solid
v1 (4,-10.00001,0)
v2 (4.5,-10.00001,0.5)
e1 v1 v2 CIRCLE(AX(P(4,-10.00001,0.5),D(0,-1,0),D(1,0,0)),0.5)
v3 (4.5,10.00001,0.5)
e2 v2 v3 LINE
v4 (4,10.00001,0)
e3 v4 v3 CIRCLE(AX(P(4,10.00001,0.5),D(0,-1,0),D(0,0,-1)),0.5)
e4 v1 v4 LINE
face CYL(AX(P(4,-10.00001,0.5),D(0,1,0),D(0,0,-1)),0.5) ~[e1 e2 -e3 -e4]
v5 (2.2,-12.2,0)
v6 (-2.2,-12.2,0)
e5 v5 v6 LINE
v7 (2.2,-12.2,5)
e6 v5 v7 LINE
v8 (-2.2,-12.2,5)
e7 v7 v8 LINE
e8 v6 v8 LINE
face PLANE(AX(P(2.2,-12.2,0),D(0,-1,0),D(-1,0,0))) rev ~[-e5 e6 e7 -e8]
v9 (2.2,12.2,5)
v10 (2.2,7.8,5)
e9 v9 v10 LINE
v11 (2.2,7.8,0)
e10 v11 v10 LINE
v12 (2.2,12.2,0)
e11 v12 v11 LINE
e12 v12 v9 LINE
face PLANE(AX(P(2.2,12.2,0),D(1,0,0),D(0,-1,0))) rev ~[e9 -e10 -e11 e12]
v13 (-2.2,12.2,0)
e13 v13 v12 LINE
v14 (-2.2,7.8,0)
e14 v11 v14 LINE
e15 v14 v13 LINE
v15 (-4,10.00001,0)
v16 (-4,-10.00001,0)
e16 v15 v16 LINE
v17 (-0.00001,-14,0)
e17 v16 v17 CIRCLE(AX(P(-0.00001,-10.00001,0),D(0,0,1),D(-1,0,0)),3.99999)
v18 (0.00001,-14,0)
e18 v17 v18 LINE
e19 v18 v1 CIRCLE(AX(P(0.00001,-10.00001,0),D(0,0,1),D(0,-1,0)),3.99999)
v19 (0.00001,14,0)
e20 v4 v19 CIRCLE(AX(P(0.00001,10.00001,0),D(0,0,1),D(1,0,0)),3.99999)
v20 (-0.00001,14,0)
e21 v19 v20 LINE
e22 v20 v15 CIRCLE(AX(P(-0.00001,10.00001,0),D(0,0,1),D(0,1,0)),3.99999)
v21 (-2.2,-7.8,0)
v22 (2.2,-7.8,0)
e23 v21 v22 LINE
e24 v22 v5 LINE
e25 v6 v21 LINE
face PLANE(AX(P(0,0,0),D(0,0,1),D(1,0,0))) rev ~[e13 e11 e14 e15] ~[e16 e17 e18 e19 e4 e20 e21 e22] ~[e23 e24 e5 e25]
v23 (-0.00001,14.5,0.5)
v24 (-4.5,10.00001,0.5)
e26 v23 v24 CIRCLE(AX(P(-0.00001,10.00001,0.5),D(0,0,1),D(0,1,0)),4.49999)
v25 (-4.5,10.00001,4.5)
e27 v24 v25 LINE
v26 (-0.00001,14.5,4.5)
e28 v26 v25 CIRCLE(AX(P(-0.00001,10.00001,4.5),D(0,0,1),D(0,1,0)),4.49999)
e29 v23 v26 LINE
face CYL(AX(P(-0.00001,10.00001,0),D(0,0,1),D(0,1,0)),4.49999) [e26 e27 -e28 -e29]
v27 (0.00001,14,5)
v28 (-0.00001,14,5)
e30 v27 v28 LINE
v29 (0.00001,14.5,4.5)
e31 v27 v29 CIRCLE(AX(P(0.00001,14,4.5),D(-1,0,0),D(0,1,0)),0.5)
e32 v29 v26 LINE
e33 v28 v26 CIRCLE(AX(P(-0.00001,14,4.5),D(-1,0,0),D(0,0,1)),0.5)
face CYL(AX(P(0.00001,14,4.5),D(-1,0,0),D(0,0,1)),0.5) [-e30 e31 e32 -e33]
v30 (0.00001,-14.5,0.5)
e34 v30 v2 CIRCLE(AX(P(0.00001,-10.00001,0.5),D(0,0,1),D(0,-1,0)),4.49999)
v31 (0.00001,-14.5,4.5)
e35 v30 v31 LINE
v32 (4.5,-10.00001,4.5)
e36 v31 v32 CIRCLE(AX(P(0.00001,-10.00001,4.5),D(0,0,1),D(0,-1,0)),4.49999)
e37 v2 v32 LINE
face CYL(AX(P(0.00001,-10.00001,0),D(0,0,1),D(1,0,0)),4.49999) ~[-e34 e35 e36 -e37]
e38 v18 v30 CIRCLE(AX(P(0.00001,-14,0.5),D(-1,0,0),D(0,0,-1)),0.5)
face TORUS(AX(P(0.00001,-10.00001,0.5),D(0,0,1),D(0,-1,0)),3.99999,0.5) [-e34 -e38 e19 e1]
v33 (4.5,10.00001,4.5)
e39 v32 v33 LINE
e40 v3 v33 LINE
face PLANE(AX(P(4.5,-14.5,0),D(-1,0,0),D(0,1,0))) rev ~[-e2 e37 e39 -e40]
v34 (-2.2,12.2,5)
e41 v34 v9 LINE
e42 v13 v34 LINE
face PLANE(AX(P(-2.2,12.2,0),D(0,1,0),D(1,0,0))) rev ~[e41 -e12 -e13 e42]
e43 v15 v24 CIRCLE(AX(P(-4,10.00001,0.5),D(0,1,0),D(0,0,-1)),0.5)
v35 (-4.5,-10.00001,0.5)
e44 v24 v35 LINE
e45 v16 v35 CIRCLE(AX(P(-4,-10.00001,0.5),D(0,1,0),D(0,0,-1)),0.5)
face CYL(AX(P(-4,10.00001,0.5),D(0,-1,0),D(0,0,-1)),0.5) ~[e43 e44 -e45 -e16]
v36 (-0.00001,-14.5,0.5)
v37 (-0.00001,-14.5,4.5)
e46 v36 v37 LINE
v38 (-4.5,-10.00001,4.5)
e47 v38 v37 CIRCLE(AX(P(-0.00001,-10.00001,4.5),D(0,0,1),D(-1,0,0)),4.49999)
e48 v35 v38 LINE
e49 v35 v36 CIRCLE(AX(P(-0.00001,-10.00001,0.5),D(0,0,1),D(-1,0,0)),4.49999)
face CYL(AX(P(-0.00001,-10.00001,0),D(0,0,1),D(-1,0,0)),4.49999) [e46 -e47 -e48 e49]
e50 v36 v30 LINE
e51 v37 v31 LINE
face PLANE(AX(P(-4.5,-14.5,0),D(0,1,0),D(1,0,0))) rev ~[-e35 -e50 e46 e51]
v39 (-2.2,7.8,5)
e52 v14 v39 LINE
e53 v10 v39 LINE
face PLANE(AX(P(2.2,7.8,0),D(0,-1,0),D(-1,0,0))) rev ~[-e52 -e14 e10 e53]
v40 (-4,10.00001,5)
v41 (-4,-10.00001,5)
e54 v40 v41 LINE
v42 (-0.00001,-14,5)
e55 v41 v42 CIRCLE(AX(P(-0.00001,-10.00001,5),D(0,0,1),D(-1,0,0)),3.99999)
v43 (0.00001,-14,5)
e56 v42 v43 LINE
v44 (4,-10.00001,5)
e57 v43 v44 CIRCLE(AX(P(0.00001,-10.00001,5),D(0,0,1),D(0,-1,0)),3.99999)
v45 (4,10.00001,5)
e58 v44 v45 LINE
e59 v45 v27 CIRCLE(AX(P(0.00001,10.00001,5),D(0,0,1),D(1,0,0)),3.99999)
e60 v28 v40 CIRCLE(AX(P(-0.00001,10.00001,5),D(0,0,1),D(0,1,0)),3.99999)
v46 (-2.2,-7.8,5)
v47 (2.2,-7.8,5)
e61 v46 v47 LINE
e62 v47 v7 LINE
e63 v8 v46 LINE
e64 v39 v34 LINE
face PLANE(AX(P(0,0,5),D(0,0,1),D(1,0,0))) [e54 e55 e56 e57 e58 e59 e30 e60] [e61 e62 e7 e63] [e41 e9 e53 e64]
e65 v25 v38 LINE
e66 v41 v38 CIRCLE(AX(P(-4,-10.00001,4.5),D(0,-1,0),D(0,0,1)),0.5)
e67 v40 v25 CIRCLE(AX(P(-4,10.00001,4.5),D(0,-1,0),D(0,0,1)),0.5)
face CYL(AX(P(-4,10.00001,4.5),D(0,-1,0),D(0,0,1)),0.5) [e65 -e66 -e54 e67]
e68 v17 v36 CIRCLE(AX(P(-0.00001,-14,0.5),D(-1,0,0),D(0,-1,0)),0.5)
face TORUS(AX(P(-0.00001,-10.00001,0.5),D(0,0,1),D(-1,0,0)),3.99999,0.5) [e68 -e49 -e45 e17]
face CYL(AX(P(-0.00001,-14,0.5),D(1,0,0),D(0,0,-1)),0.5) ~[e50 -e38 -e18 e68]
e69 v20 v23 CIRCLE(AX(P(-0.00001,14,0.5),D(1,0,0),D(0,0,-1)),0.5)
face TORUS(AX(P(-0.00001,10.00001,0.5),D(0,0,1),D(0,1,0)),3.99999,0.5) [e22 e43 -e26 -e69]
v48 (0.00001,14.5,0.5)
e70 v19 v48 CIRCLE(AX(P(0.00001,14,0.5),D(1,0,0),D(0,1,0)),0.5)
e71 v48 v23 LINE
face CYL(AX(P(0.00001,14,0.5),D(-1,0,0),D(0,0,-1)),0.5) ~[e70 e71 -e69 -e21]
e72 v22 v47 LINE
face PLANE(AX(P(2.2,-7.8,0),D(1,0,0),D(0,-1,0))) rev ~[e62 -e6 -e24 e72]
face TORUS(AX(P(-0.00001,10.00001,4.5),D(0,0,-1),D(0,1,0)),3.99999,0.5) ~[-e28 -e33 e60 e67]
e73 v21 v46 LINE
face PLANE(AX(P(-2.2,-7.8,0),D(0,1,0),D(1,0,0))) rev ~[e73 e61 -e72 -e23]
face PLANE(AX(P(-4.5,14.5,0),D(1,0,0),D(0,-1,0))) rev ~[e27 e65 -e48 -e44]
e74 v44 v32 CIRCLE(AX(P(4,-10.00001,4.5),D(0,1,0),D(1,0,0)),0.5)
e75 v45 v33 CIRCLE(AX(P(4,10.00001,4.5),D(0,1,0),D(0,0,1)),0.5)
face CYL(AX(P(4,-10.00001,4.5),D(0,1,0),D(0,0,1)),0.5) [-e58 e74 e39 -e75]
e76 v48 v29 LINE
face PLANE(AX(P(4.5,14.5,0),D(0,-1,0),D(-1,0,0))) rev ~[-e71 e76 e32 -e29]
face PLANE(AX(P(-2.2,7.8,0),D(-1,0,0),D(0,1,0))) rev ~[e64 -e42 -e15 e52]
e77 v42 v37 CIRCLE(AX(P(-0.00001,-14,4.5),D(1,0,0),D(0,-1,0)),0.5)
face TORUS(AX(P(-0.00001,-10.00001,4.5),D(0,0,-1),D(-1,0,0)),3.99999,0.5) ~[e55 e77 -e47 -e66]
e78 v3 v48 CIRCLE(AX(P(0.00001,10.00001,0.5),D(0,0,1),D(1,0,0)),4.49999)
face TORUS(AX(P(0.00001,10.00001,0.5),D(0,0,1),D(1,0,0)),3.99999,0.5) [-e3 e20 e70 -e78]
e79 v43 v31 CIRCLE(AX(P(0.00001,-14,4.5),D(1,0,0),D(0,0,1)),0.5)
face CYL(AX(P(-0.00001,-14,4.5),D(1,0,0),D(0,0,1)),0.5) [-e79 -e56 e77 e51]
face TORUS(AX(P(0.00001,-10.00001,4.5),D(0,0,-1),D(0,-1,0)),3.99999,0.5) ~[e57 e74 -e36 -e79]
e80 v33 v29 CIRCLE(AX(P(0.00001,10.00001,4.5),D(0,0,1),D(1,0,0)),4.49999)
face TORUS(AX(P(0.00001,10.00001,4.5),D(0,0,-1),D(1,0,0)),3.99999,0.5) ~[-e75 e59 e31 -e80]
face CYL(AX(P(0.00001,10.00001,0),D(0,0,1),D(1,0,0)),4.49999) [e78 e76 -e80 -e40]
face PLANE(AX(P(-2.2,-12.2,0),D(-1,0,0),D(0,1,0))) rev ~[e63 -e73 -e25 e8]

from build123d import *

# Parameters (mm, degrees)
F1_DEPTH = 5
F2_R     = 4.49999
F3_R     = 0.5


# Not quite as in the source:
# - a fillet or chamfer is up to 0.001 mm smaller than in the source, because OpenCascade refuses the exact size


with BuildPart() as f1:
    # F0 (on Top) → F1 (new body)
    with BuildSketch(Plane.XY):
        Polygon((4.5, -14.5), (4.5, 14.5), (0, 14.5), (-4.5, 14.5), (-4.5, -14.5), (0, -14.5), align=None)
        Polygon((2.2, -12.2), (0, -12.2), (-2.2, -12.2), (-2.2, -7.8), (2.2, -7.8), align=None, mode=Mode.SUBTRACT)
        Polygon((-2.2, 12.2), (0, 12.2), (2.2, 12.2), (2.2, 7.8), (-2.2, 7.8), align=None, mode=Mode.SUBTRACT)
    extrude(amount=F1_DEPTH)

    # F2 (radius 4.5 in the source; OpenCascade refuses exactly that, so slightly less here)
    f2_edges = [f1.edges().sort_by_distance(p)[0] for p in [
        (-4.5, 14.5, 2.5),
        (4.5, 14.5, 2.5),
        (4.5, -14.5, 2.5),
        (-4.5, -14.5, 2.5),
    ]]
    fillet(f2_edges, radius=F2_R)

    # F3
    f3_edges = [f1.edges().sort_by_distance(p)[0] for p in [
        (-4.5, 0, 5),
        (-4.5, 0, 0),
    ]]
    fillet(f3_edges, radius=F3_R)


solid = f1.part
